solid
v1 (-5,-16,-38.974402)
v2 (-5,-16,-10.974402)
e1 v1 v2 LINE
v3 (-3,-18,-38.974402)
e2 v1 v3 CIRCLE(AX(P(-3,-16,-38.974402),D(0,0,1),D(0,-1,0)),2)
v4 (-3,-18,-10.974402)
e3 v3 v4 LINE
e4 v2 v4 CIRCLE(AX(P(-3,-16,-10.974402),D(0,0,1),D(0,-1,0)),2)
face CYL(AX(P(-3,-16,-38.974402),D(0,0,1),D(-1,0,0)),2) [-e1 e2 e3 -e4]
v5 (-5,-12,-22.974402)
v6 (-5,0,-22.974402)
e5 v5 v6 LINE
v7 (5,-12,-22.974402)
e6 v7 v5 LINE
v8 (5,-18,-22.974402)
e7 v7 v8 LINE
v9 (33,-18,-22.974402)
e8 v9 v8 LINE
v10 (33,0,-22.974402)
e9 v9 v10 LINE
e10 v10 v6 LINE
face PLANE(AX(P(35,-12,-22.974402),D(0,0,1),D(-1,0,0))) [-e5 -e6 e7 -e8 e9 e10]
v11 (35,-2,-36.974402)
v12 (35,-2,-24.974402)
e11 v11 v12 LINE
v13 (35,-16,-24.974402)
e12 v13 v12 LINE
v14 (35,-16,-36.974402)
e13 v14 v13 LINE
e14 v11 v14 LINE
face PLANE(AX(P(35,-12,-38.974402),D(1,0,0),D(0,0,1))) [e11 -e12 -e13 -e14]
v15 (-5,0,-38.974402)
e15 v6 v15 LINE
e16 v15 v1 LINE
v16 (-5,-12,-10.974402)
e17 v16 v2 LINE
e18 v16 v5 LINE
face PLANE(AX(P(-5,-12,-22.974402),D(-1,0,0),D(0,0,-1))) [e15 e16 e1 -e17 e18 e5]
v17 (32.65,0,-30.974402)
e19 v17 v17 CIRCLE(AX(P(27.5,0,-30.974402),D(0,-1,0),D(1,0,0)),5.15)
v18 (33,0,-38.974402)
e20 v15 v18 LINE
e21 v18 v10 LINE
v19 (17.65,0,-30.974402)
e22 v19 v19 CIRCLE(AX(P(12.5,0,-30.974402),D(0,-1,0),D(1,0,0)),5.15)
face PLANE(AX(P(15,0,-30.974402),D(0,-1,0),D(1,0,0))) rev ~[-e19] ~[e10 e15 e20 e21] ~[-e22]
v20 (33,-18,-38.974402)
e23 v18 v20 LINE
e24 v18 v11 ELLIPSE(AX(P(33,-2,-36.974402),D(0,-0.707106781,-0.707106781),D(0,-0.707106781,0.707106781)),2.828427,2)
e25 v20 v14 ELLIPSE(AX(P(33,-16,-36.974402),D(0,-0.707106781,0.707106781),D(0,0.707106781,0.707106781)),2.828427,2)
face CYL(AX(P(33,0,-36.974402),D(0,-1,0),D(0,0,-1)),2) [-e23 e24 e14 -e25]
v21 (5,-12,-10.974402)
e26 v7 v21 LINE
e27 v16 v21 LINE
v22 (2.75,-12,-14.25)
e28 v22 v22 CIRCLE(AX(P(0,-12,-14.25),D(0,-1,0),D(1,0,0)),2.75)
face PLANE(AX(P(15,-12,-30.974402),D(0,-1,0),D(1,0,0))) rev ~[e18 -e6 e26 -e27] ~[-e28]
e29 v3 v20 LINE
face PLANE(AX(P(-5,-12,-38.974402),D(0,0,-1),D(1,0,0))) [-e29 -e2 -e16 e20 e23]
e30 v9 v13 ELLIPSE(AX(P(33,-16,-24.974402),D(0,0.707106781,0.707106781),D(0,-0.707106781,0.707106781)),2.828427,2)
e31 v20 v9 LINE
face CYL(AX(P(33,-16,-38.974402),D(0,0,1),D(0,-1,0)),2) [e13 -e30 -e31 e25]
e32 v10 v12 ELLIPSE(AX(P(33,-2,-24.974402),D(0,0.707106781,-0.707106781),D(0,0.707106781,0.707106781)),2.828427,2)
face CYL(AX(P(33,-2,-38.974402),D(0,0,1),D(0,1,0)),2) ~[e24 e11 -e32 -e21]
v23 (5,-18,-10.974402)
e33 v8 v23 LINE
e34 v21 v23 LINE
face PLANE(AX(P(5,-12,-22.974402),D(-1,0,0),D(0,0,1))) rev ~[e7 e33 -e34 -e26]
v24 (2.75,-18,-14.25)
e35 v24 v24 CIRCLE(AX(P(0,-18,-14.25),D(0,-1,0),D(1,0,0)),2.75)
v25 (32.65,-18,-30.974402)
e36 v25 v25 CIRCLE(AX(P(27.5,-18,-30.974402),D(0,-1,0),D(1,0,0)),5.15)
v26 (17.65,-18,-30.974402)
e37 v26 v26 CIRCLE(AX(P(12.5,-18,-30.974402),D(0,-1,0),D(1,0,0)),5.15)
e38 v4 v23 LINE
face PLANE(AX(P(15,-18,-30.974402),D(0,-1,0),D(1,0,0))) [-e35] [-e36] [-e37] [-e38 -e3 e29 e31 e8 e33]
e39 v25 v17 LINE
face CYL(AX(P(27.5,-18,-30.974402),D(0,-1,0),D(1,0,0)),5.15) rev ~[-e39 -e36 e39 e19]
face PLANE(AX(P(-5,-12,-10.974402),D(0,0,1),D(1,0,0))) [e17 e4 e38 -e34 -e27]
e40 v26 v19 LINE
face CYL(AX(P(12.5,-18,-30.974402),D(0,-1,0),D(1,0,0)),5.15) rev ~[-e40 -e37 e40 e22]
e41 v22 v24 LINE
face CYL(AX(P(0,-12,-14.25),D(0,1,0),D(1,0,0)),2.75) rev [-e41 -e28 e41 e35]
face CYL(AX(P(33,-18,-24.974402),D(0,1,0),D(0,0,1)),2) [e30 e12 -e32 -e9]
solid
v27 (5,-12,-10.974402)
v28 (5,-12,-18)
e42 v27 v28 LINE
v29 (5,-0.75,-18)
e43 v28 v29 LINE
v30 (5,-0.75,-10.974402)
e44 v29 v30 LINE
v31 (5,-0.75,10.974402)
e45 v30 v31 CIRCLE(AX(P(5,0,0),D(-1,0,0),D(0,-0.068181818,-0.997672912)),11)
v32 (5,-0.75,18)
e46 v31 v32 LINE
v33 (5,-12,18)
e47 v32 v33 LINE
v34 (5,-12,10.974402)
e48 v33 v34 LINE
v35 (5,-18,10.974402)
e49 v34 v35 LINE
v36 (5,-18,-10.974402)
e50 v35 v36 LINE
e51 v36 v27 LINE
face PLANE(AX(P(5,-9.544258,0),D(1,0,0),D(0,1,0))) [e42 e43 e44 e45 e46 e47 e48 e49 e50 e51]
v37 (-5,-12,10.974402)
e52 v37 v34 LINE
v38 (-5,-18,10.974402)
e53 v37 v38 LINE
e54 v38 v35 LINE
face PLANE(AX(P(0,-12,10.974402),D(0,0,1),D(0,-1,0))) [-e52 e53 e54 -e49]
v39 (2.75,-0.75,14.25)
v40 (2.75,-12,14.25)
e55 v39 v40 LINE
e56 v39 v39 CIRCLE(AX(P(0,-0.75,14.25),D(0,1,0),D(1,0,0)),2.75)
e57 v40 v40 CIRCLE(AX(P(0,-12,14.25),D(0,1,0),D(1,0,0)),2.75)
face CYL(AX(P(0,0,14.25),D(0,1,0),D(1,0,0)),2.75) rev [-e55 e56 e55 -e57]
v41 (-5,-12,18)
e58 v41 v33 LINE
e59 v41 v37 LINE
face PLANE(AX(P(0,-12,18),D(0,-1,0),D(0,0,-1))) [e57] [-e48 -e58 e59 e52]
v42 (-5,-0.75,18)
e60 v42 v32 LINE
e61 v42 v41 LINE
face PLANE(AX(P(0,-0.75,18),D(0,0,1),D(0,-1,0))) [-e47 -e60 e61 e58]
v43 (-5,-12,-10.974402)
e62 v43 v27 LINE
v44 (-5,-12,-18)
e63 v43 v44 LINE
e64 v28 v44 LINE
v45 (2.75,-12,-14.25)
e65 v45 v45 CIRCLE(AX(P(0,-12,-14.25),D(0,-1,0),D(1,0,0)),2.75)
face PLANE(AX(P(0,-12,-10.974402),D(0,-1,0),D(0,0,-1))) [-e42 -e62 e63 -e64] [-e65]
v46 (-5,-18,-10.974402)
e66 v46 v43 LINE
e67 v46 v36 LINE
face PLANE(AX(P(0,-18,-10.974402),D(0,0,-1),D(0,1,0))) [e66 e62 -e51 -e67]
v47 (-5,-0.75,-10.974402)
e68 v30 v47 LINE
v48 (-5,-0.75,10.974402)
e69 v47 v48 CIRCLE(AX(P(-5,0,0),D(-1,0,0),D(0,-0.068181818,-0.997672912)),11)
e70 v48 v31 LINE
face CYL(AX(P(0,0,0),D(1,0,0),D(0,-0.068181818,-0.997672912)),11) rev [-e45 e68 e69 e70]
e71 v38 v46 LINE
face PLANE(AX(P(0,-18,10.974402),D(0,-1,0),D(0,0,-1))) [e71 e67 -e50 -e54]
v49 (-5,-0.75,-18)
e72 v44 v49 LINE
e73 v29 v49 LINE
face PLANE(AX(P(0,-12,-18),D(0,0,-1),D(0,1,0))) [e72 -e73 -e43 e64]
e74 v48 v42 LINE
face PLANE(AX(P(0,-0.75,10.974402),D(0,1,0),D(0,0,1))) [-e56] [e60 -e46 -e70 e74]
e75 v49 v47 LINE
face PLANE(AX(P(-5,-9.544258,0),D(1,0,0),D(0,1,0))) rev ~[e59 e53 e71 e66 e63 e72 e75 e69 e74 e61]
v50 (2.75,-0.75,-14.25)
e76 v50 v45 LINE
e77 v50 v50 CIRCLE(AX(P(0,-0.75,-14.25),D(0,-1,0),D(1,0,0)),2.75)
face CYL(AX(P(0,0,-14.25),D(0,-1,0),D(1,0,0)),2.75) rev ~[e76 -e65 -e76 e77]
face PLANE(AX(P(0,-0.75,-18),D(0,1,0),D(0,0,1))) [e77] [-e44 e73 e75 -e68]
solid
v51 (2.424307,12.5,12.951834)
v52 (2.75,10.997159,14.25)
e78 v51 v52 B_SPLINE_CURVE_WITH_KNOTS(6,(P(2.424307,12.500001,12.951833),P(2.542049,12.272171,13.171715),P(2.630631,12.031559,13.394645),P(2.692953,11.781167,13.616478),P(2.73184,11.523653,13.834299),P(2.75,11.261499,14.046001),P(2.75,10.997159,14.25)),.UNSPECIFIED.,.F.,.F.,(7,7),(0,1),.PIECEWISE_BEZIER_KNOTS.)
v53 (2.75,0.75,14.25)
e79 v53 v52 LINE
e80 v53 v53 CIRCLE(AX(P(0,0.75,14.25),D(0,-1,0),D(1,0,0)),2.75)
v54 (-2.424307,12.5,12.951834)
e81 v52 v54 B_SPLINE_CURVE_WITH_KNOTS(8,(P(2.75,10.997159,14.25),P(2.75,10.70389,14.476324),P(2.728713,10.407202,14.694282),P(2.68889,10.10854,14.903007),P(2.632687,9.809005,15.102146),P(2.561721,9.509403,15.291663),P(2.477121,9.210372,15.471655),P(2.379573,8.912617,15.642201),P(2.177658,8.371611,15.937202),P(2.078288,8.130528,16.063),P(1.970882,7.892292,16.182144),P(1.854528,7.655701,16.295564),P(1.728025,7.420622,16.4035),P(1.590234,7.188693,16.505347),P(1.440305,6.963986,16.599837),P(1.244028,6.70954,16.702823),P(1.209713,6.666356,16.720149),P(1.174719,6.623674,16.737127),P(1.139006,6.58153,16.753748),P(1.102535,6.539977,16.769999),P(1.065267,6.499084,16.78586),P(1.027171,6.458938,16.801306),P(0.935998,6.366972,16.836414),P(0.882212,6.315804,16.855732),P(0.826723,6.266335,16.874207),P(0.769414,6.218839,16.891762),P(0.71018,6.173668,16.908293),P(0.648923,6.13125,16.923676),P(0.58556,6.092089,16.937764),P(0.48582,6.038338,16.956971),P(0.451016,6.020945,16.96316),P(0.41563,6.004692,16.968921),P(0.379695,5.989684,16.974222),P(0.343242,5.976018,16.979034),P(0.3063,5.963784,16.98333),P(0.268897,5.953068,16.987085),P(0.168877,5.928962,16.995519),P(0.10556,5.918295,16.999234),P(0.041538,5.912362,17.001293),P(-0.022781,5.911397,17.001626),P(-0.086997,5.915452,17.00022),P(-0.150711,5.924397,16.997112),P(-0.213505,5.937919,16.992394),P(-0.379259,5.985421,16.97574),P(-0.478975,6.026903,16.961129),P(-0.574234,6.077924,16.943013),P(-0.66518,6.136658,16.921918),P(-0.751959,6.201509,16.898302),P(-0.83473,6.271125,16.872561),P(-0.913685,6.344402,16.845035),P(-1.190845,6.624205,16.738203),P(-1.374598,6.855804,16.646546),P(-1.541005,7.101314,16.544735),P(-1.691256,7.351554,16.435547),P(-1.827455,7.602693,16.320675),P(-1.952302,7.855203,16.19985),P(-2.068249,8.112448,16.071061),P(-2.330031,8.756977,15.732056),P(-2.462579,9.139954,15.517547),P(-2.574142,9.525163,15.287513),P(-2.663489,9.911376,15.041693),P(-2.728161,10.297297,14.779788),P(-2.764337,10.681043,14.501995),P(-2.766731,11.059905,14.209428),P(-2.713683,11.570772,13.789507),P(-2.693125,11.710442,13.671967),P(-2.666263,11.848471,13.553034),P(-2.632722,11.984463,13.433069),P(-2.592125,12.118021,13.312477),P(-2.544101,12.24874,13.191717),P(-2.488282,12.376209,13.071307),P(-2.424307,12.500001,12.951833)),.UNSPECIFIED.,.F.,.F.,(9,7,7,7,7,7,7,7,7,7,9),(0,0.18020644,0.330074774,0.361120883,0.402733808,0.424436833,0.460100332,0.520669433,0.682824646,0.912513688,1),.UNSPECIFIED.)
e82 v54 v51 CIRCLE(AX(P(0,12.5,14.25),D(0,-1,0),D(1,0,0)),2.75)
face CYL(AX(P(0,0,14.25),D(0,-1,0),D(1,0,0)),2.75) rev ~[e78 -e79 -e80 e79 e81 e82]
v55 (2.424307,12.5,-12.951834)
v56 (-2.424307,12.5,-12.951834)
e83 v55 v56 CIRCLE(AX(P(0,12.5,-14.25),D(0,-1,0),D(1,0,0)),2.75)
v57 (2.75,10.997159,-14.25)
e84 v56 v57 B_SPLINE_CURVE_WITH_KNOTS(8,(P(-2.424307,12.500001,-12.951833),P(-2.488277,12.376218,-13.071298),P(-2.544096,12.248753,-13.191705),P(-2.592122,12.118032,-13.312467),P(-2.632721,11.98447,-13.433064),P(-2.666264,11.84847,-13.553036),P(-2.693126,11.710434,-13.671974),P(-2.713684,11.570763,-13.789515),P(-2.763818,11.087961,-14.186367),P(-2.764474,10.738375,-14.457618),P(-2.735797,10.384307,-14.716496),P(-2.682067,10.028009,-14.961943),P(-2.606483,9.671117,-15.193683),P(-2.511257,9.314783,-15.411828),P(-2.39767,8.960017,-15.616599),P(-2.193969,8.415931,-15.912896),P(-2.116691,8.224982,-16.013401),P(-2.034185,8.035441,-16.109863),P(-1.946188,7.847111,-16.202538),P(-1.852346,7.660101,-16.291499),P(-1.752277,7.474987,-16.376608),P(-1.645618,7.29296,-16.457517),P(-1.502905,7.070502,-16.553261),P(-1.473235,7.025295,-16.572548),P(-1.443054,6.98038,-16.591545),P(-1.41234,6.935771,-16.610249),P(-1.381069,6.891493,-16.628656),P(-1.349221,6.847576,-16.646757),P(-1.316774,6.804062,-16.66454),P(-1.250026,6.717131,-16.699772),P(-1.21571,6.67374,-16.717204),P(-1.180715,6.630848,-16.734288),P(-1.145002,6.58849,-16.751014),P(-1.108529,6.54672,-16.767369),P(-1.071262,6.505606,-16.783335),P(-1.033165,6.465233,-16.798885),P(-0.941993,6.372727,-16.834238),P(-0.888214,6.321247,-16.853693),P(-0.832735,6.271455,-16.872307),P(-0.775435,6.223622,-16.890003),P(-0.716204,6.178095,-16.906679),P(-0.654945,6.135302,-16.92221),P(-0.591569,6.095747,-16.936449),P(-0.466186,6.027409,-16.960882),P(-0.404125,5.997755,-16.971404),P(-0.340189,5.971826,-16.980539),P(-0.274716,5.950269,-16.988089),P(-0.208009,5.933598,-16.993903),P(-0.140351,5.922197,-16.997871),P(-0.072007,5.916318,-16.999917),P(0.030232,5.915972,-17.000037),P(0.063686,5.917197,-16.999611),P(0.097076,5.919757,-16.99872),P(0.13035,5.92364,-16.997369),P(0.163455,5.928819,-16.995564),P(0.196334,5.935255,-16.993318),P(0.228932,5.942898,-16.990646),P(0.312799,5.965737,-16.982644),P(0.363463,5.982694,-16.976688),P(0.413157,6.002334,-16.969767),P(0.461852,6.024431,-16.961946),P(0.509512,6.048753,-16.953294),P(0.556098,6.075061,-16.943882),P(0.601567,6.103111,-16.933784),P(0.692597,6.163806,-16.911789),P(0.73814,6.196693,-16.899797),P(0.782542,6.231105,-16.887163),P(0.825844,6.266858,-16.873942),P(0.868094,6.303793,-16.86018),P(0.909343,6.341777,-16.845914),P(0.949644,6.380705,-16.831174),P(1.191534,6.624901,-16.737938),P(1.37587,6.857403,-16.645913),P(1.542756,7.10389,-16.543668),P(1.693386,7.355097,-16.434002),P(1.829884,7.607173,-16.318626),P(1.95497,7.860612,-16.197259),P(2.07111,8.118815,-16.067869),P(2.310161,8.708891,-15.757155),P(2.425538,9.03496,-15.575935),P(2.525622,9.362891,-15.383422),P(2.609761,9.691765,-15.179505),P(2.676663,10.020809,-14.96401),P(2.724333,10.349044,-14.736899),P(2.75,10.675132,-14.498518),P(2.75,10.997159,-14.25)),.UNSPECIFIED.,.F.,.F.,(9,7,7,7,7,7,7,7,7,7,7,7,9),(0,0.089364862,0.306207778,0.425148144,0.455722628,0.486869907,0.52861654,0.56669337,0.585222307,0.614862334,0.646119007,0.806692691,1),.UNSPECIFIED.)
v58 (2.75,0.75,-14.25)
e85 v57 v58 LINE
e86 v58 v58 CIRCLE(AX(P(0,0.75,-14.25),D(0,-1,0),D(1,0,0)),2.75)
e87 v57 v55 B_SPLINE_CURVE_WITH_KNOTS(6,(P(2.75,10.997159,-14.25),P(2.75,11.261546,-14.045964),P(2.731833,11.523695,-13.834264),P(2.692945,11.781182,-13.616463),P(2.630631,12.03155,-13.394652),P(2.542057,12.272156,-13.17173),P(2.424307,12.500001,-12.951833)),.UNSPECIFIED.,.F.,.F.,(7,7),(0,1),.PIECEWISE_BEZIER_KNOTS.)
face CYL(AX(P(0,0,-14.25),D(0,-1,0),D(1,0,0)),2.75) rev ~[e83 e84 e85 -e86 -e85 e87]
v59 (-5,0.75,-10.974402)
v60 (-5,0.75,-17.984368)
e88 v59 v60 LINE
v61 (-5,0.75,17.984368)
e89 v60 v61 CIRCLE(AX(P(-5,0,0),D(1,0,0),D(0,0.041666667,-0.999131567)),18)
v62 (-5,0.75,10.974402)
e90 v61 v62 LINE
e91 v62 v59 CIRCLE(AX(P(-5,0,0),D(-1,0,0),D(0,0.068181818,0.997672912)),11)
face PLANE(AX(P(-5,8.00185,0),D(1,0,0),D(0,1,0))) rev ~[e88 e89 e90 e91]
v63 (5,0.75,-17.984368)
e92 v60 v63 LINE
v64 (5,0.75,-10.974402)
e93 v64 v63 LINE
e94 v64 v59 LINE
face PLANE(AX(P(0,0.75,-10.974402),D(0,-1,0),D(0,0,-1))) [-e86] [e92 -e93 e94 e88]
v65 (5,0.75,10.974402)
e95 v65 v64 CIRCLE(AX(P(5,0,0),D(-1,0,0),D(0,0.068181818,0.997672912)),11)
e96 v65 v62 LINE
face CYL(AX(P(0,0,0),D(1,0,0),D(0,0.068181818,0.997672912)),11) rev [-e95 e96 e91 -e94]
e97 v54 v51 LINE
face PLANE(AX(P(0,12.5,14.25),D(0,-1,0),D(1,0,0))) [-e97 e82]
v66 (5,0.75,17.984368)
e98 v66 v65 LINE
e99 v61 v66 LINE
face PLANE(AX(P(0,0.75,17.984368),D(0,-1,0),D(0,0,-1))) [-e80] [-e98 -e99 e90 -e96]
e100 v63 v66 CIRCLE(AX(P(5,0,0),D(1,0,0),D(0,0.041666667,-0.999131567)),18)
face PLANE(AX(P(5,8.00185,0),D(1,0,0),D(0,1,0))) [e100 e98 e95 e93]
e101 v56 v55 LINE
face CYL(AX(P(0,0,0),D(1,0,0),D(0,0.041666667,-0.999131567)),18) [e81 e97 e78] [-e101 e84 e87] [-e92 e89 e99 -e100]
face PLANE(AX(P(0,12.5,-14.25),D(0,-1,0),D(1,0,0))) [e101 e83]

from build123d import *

# Parameters (mm, degrees)
F1_DEPTH      = 5
F2_R          = 2.75
F3_DEPTH      = 12.5
F4_W          = 10
F4_H          = 4.9744020338
F4_H_2        = 7.0255979662
F4_R          = 2.75
F5_DEPTH      = 6
F6_DEPTH      = 6
F6_DEPTH_BACK = 12
F7_R          = 5.15
F8_DEPTH      = 18
F9_DEPTH      = 18
F11_R         = 2


# Not quite as in the source:
# - the program builds the solid bodies; features that only make, move or delete a surface that nothing else refers to are left out


with BuildPart() as f1:
    # F0 (on Right) → F1 (new body, symmetric)
    with BuildSketch(Plane.YZ):
        with BuildLine():
            ThreePointArc((-0.75, -10.9744020338), (-11, 0), (-0.75, 10.9744020338))
            Line((-0.75, 10.9744020338), (-0.75, 18))
            Line((-0.75, 18), (-12, 18))
            Line((-12, 18), (-12, 10.9744020338))
            Line((-12, 10.9744020338), (-18, 10.9744020338))
            Line((-18, 10.9744020338), (-18, -10.9744020338))
            Line((-18, -10.9744020338), (-12, -10.9744020338))
            Line((-12, -10.9744020338), (-12, -18))
            Line((-12, -18), (-0.75, -18))
            Line((-0.75, -18), (-0.75, -10.9744020338))
        make_face()
    extrude(amount=F1_DEPTH, both=True)


with BuildPart() as f1b:
    # F0 (on Right) → F1, piece 2 (new body, symmetric)
    with BuildSketch(Plane.YZ):
        with BuildLine():
            Line((0.75, -10.9744020338), (0.75, -17.9843682124))
            ThreePointArc((0.75, -17.9843682124), (18, 0), (0.75, 17.9843682124))
            Line((0.75, 17.9843682124), (0.75, 10.9744020338))
            ThreePointArc((0.75, 10.9744020338), (11, 0), (0.75, -10.9744020338))
        make_face()
    extrude(amount=F1_DEPTH, both=True)


with BuildPart() as f3_tool:
    # F2 (on Front) → F3 (new body, symmetric)
    with BuildSketch(Plane.XZ):
        with Locations((0, 14.25)):
            Circle(F2_R)
        with Locations((0, -14.25)):
            Circle(F2_R)
    extrude(amount=F3_DEPTH, both=True)


with BuildPart() as f1_1:
    add(f1.part)

    # F3: cut by f3_tool
    add(f3_tool.part, mode=Mode.SUBTRACT)


with BuildPart() as f1b_1:
    add(f1b.part)

    # F3: cut by f3_tool
    add(f3_tool.part, mode=Mode.SUBTRACT)


with BuildPart() as f5:
    # F4 (on face) → F5 (new body, through all)
    with BuildSketch(Plane.XZ.offset(12)):
        with Locations((0, -20.4872010169)):
            Rectangle(F4_W, F4_H)
        with Locations((0, -14.4872010169)):
            Rectangle(F4_W, F4_H_2)
        with Locations((0, -14.25)):
            Circle(F4_R, mode=Mode.SUBTRACT)
    extrude(amount=F5_DEPTH)

    # F4 (on face) → F6 (join, two sides)
    with BuildSketch(Plane.XZ.offset(12)) as f6_sk:
        Polygon((5, -22.9744020338), (-5, -22.9744020338), (-5, -38.9744020338), (35, -38.9744020338), (35, -22.9744020338), align=None)
    extrude(amount=F6_DEPTH)
    extrude(f6_sk.sketch, amount=-F6_DEPTH_BACK)

    # F7 (on face) → F8 (cut, through all)
    with BuildSketch(Plane.XZ.offset(18)):
        with Locations((12.5, -30.9744020338)):
            Circle(F7_R)
    extrude(amount=-F8_DEPTH, mode=Mode.SUBTRACT)

    # F7 (on face) → F9 (cut, through all)
    with BuildSketch(Plane.XZ.offset(18)):
        with Locations((27.5, -30.9744020338)):
            Circle(F7_R)
    extrude(amount=-F9_DEPTH, mode=Mode.SUBTRACT)

    # F11
    f11_edges = [f5.edges().sort_by_distance(p)[0] for p in [
        (35, -18, -30.974402),
        (35, 0, -30.974402),
        (35, -9, -38.974402),
        (35, -9, -22.974402),
        (-5, -18, -24.974402),
    ]]
    fillet(f11_edges, radius=F11_R)


solid = Compound([f1_1.part, f1b_1.part, f5.part])
